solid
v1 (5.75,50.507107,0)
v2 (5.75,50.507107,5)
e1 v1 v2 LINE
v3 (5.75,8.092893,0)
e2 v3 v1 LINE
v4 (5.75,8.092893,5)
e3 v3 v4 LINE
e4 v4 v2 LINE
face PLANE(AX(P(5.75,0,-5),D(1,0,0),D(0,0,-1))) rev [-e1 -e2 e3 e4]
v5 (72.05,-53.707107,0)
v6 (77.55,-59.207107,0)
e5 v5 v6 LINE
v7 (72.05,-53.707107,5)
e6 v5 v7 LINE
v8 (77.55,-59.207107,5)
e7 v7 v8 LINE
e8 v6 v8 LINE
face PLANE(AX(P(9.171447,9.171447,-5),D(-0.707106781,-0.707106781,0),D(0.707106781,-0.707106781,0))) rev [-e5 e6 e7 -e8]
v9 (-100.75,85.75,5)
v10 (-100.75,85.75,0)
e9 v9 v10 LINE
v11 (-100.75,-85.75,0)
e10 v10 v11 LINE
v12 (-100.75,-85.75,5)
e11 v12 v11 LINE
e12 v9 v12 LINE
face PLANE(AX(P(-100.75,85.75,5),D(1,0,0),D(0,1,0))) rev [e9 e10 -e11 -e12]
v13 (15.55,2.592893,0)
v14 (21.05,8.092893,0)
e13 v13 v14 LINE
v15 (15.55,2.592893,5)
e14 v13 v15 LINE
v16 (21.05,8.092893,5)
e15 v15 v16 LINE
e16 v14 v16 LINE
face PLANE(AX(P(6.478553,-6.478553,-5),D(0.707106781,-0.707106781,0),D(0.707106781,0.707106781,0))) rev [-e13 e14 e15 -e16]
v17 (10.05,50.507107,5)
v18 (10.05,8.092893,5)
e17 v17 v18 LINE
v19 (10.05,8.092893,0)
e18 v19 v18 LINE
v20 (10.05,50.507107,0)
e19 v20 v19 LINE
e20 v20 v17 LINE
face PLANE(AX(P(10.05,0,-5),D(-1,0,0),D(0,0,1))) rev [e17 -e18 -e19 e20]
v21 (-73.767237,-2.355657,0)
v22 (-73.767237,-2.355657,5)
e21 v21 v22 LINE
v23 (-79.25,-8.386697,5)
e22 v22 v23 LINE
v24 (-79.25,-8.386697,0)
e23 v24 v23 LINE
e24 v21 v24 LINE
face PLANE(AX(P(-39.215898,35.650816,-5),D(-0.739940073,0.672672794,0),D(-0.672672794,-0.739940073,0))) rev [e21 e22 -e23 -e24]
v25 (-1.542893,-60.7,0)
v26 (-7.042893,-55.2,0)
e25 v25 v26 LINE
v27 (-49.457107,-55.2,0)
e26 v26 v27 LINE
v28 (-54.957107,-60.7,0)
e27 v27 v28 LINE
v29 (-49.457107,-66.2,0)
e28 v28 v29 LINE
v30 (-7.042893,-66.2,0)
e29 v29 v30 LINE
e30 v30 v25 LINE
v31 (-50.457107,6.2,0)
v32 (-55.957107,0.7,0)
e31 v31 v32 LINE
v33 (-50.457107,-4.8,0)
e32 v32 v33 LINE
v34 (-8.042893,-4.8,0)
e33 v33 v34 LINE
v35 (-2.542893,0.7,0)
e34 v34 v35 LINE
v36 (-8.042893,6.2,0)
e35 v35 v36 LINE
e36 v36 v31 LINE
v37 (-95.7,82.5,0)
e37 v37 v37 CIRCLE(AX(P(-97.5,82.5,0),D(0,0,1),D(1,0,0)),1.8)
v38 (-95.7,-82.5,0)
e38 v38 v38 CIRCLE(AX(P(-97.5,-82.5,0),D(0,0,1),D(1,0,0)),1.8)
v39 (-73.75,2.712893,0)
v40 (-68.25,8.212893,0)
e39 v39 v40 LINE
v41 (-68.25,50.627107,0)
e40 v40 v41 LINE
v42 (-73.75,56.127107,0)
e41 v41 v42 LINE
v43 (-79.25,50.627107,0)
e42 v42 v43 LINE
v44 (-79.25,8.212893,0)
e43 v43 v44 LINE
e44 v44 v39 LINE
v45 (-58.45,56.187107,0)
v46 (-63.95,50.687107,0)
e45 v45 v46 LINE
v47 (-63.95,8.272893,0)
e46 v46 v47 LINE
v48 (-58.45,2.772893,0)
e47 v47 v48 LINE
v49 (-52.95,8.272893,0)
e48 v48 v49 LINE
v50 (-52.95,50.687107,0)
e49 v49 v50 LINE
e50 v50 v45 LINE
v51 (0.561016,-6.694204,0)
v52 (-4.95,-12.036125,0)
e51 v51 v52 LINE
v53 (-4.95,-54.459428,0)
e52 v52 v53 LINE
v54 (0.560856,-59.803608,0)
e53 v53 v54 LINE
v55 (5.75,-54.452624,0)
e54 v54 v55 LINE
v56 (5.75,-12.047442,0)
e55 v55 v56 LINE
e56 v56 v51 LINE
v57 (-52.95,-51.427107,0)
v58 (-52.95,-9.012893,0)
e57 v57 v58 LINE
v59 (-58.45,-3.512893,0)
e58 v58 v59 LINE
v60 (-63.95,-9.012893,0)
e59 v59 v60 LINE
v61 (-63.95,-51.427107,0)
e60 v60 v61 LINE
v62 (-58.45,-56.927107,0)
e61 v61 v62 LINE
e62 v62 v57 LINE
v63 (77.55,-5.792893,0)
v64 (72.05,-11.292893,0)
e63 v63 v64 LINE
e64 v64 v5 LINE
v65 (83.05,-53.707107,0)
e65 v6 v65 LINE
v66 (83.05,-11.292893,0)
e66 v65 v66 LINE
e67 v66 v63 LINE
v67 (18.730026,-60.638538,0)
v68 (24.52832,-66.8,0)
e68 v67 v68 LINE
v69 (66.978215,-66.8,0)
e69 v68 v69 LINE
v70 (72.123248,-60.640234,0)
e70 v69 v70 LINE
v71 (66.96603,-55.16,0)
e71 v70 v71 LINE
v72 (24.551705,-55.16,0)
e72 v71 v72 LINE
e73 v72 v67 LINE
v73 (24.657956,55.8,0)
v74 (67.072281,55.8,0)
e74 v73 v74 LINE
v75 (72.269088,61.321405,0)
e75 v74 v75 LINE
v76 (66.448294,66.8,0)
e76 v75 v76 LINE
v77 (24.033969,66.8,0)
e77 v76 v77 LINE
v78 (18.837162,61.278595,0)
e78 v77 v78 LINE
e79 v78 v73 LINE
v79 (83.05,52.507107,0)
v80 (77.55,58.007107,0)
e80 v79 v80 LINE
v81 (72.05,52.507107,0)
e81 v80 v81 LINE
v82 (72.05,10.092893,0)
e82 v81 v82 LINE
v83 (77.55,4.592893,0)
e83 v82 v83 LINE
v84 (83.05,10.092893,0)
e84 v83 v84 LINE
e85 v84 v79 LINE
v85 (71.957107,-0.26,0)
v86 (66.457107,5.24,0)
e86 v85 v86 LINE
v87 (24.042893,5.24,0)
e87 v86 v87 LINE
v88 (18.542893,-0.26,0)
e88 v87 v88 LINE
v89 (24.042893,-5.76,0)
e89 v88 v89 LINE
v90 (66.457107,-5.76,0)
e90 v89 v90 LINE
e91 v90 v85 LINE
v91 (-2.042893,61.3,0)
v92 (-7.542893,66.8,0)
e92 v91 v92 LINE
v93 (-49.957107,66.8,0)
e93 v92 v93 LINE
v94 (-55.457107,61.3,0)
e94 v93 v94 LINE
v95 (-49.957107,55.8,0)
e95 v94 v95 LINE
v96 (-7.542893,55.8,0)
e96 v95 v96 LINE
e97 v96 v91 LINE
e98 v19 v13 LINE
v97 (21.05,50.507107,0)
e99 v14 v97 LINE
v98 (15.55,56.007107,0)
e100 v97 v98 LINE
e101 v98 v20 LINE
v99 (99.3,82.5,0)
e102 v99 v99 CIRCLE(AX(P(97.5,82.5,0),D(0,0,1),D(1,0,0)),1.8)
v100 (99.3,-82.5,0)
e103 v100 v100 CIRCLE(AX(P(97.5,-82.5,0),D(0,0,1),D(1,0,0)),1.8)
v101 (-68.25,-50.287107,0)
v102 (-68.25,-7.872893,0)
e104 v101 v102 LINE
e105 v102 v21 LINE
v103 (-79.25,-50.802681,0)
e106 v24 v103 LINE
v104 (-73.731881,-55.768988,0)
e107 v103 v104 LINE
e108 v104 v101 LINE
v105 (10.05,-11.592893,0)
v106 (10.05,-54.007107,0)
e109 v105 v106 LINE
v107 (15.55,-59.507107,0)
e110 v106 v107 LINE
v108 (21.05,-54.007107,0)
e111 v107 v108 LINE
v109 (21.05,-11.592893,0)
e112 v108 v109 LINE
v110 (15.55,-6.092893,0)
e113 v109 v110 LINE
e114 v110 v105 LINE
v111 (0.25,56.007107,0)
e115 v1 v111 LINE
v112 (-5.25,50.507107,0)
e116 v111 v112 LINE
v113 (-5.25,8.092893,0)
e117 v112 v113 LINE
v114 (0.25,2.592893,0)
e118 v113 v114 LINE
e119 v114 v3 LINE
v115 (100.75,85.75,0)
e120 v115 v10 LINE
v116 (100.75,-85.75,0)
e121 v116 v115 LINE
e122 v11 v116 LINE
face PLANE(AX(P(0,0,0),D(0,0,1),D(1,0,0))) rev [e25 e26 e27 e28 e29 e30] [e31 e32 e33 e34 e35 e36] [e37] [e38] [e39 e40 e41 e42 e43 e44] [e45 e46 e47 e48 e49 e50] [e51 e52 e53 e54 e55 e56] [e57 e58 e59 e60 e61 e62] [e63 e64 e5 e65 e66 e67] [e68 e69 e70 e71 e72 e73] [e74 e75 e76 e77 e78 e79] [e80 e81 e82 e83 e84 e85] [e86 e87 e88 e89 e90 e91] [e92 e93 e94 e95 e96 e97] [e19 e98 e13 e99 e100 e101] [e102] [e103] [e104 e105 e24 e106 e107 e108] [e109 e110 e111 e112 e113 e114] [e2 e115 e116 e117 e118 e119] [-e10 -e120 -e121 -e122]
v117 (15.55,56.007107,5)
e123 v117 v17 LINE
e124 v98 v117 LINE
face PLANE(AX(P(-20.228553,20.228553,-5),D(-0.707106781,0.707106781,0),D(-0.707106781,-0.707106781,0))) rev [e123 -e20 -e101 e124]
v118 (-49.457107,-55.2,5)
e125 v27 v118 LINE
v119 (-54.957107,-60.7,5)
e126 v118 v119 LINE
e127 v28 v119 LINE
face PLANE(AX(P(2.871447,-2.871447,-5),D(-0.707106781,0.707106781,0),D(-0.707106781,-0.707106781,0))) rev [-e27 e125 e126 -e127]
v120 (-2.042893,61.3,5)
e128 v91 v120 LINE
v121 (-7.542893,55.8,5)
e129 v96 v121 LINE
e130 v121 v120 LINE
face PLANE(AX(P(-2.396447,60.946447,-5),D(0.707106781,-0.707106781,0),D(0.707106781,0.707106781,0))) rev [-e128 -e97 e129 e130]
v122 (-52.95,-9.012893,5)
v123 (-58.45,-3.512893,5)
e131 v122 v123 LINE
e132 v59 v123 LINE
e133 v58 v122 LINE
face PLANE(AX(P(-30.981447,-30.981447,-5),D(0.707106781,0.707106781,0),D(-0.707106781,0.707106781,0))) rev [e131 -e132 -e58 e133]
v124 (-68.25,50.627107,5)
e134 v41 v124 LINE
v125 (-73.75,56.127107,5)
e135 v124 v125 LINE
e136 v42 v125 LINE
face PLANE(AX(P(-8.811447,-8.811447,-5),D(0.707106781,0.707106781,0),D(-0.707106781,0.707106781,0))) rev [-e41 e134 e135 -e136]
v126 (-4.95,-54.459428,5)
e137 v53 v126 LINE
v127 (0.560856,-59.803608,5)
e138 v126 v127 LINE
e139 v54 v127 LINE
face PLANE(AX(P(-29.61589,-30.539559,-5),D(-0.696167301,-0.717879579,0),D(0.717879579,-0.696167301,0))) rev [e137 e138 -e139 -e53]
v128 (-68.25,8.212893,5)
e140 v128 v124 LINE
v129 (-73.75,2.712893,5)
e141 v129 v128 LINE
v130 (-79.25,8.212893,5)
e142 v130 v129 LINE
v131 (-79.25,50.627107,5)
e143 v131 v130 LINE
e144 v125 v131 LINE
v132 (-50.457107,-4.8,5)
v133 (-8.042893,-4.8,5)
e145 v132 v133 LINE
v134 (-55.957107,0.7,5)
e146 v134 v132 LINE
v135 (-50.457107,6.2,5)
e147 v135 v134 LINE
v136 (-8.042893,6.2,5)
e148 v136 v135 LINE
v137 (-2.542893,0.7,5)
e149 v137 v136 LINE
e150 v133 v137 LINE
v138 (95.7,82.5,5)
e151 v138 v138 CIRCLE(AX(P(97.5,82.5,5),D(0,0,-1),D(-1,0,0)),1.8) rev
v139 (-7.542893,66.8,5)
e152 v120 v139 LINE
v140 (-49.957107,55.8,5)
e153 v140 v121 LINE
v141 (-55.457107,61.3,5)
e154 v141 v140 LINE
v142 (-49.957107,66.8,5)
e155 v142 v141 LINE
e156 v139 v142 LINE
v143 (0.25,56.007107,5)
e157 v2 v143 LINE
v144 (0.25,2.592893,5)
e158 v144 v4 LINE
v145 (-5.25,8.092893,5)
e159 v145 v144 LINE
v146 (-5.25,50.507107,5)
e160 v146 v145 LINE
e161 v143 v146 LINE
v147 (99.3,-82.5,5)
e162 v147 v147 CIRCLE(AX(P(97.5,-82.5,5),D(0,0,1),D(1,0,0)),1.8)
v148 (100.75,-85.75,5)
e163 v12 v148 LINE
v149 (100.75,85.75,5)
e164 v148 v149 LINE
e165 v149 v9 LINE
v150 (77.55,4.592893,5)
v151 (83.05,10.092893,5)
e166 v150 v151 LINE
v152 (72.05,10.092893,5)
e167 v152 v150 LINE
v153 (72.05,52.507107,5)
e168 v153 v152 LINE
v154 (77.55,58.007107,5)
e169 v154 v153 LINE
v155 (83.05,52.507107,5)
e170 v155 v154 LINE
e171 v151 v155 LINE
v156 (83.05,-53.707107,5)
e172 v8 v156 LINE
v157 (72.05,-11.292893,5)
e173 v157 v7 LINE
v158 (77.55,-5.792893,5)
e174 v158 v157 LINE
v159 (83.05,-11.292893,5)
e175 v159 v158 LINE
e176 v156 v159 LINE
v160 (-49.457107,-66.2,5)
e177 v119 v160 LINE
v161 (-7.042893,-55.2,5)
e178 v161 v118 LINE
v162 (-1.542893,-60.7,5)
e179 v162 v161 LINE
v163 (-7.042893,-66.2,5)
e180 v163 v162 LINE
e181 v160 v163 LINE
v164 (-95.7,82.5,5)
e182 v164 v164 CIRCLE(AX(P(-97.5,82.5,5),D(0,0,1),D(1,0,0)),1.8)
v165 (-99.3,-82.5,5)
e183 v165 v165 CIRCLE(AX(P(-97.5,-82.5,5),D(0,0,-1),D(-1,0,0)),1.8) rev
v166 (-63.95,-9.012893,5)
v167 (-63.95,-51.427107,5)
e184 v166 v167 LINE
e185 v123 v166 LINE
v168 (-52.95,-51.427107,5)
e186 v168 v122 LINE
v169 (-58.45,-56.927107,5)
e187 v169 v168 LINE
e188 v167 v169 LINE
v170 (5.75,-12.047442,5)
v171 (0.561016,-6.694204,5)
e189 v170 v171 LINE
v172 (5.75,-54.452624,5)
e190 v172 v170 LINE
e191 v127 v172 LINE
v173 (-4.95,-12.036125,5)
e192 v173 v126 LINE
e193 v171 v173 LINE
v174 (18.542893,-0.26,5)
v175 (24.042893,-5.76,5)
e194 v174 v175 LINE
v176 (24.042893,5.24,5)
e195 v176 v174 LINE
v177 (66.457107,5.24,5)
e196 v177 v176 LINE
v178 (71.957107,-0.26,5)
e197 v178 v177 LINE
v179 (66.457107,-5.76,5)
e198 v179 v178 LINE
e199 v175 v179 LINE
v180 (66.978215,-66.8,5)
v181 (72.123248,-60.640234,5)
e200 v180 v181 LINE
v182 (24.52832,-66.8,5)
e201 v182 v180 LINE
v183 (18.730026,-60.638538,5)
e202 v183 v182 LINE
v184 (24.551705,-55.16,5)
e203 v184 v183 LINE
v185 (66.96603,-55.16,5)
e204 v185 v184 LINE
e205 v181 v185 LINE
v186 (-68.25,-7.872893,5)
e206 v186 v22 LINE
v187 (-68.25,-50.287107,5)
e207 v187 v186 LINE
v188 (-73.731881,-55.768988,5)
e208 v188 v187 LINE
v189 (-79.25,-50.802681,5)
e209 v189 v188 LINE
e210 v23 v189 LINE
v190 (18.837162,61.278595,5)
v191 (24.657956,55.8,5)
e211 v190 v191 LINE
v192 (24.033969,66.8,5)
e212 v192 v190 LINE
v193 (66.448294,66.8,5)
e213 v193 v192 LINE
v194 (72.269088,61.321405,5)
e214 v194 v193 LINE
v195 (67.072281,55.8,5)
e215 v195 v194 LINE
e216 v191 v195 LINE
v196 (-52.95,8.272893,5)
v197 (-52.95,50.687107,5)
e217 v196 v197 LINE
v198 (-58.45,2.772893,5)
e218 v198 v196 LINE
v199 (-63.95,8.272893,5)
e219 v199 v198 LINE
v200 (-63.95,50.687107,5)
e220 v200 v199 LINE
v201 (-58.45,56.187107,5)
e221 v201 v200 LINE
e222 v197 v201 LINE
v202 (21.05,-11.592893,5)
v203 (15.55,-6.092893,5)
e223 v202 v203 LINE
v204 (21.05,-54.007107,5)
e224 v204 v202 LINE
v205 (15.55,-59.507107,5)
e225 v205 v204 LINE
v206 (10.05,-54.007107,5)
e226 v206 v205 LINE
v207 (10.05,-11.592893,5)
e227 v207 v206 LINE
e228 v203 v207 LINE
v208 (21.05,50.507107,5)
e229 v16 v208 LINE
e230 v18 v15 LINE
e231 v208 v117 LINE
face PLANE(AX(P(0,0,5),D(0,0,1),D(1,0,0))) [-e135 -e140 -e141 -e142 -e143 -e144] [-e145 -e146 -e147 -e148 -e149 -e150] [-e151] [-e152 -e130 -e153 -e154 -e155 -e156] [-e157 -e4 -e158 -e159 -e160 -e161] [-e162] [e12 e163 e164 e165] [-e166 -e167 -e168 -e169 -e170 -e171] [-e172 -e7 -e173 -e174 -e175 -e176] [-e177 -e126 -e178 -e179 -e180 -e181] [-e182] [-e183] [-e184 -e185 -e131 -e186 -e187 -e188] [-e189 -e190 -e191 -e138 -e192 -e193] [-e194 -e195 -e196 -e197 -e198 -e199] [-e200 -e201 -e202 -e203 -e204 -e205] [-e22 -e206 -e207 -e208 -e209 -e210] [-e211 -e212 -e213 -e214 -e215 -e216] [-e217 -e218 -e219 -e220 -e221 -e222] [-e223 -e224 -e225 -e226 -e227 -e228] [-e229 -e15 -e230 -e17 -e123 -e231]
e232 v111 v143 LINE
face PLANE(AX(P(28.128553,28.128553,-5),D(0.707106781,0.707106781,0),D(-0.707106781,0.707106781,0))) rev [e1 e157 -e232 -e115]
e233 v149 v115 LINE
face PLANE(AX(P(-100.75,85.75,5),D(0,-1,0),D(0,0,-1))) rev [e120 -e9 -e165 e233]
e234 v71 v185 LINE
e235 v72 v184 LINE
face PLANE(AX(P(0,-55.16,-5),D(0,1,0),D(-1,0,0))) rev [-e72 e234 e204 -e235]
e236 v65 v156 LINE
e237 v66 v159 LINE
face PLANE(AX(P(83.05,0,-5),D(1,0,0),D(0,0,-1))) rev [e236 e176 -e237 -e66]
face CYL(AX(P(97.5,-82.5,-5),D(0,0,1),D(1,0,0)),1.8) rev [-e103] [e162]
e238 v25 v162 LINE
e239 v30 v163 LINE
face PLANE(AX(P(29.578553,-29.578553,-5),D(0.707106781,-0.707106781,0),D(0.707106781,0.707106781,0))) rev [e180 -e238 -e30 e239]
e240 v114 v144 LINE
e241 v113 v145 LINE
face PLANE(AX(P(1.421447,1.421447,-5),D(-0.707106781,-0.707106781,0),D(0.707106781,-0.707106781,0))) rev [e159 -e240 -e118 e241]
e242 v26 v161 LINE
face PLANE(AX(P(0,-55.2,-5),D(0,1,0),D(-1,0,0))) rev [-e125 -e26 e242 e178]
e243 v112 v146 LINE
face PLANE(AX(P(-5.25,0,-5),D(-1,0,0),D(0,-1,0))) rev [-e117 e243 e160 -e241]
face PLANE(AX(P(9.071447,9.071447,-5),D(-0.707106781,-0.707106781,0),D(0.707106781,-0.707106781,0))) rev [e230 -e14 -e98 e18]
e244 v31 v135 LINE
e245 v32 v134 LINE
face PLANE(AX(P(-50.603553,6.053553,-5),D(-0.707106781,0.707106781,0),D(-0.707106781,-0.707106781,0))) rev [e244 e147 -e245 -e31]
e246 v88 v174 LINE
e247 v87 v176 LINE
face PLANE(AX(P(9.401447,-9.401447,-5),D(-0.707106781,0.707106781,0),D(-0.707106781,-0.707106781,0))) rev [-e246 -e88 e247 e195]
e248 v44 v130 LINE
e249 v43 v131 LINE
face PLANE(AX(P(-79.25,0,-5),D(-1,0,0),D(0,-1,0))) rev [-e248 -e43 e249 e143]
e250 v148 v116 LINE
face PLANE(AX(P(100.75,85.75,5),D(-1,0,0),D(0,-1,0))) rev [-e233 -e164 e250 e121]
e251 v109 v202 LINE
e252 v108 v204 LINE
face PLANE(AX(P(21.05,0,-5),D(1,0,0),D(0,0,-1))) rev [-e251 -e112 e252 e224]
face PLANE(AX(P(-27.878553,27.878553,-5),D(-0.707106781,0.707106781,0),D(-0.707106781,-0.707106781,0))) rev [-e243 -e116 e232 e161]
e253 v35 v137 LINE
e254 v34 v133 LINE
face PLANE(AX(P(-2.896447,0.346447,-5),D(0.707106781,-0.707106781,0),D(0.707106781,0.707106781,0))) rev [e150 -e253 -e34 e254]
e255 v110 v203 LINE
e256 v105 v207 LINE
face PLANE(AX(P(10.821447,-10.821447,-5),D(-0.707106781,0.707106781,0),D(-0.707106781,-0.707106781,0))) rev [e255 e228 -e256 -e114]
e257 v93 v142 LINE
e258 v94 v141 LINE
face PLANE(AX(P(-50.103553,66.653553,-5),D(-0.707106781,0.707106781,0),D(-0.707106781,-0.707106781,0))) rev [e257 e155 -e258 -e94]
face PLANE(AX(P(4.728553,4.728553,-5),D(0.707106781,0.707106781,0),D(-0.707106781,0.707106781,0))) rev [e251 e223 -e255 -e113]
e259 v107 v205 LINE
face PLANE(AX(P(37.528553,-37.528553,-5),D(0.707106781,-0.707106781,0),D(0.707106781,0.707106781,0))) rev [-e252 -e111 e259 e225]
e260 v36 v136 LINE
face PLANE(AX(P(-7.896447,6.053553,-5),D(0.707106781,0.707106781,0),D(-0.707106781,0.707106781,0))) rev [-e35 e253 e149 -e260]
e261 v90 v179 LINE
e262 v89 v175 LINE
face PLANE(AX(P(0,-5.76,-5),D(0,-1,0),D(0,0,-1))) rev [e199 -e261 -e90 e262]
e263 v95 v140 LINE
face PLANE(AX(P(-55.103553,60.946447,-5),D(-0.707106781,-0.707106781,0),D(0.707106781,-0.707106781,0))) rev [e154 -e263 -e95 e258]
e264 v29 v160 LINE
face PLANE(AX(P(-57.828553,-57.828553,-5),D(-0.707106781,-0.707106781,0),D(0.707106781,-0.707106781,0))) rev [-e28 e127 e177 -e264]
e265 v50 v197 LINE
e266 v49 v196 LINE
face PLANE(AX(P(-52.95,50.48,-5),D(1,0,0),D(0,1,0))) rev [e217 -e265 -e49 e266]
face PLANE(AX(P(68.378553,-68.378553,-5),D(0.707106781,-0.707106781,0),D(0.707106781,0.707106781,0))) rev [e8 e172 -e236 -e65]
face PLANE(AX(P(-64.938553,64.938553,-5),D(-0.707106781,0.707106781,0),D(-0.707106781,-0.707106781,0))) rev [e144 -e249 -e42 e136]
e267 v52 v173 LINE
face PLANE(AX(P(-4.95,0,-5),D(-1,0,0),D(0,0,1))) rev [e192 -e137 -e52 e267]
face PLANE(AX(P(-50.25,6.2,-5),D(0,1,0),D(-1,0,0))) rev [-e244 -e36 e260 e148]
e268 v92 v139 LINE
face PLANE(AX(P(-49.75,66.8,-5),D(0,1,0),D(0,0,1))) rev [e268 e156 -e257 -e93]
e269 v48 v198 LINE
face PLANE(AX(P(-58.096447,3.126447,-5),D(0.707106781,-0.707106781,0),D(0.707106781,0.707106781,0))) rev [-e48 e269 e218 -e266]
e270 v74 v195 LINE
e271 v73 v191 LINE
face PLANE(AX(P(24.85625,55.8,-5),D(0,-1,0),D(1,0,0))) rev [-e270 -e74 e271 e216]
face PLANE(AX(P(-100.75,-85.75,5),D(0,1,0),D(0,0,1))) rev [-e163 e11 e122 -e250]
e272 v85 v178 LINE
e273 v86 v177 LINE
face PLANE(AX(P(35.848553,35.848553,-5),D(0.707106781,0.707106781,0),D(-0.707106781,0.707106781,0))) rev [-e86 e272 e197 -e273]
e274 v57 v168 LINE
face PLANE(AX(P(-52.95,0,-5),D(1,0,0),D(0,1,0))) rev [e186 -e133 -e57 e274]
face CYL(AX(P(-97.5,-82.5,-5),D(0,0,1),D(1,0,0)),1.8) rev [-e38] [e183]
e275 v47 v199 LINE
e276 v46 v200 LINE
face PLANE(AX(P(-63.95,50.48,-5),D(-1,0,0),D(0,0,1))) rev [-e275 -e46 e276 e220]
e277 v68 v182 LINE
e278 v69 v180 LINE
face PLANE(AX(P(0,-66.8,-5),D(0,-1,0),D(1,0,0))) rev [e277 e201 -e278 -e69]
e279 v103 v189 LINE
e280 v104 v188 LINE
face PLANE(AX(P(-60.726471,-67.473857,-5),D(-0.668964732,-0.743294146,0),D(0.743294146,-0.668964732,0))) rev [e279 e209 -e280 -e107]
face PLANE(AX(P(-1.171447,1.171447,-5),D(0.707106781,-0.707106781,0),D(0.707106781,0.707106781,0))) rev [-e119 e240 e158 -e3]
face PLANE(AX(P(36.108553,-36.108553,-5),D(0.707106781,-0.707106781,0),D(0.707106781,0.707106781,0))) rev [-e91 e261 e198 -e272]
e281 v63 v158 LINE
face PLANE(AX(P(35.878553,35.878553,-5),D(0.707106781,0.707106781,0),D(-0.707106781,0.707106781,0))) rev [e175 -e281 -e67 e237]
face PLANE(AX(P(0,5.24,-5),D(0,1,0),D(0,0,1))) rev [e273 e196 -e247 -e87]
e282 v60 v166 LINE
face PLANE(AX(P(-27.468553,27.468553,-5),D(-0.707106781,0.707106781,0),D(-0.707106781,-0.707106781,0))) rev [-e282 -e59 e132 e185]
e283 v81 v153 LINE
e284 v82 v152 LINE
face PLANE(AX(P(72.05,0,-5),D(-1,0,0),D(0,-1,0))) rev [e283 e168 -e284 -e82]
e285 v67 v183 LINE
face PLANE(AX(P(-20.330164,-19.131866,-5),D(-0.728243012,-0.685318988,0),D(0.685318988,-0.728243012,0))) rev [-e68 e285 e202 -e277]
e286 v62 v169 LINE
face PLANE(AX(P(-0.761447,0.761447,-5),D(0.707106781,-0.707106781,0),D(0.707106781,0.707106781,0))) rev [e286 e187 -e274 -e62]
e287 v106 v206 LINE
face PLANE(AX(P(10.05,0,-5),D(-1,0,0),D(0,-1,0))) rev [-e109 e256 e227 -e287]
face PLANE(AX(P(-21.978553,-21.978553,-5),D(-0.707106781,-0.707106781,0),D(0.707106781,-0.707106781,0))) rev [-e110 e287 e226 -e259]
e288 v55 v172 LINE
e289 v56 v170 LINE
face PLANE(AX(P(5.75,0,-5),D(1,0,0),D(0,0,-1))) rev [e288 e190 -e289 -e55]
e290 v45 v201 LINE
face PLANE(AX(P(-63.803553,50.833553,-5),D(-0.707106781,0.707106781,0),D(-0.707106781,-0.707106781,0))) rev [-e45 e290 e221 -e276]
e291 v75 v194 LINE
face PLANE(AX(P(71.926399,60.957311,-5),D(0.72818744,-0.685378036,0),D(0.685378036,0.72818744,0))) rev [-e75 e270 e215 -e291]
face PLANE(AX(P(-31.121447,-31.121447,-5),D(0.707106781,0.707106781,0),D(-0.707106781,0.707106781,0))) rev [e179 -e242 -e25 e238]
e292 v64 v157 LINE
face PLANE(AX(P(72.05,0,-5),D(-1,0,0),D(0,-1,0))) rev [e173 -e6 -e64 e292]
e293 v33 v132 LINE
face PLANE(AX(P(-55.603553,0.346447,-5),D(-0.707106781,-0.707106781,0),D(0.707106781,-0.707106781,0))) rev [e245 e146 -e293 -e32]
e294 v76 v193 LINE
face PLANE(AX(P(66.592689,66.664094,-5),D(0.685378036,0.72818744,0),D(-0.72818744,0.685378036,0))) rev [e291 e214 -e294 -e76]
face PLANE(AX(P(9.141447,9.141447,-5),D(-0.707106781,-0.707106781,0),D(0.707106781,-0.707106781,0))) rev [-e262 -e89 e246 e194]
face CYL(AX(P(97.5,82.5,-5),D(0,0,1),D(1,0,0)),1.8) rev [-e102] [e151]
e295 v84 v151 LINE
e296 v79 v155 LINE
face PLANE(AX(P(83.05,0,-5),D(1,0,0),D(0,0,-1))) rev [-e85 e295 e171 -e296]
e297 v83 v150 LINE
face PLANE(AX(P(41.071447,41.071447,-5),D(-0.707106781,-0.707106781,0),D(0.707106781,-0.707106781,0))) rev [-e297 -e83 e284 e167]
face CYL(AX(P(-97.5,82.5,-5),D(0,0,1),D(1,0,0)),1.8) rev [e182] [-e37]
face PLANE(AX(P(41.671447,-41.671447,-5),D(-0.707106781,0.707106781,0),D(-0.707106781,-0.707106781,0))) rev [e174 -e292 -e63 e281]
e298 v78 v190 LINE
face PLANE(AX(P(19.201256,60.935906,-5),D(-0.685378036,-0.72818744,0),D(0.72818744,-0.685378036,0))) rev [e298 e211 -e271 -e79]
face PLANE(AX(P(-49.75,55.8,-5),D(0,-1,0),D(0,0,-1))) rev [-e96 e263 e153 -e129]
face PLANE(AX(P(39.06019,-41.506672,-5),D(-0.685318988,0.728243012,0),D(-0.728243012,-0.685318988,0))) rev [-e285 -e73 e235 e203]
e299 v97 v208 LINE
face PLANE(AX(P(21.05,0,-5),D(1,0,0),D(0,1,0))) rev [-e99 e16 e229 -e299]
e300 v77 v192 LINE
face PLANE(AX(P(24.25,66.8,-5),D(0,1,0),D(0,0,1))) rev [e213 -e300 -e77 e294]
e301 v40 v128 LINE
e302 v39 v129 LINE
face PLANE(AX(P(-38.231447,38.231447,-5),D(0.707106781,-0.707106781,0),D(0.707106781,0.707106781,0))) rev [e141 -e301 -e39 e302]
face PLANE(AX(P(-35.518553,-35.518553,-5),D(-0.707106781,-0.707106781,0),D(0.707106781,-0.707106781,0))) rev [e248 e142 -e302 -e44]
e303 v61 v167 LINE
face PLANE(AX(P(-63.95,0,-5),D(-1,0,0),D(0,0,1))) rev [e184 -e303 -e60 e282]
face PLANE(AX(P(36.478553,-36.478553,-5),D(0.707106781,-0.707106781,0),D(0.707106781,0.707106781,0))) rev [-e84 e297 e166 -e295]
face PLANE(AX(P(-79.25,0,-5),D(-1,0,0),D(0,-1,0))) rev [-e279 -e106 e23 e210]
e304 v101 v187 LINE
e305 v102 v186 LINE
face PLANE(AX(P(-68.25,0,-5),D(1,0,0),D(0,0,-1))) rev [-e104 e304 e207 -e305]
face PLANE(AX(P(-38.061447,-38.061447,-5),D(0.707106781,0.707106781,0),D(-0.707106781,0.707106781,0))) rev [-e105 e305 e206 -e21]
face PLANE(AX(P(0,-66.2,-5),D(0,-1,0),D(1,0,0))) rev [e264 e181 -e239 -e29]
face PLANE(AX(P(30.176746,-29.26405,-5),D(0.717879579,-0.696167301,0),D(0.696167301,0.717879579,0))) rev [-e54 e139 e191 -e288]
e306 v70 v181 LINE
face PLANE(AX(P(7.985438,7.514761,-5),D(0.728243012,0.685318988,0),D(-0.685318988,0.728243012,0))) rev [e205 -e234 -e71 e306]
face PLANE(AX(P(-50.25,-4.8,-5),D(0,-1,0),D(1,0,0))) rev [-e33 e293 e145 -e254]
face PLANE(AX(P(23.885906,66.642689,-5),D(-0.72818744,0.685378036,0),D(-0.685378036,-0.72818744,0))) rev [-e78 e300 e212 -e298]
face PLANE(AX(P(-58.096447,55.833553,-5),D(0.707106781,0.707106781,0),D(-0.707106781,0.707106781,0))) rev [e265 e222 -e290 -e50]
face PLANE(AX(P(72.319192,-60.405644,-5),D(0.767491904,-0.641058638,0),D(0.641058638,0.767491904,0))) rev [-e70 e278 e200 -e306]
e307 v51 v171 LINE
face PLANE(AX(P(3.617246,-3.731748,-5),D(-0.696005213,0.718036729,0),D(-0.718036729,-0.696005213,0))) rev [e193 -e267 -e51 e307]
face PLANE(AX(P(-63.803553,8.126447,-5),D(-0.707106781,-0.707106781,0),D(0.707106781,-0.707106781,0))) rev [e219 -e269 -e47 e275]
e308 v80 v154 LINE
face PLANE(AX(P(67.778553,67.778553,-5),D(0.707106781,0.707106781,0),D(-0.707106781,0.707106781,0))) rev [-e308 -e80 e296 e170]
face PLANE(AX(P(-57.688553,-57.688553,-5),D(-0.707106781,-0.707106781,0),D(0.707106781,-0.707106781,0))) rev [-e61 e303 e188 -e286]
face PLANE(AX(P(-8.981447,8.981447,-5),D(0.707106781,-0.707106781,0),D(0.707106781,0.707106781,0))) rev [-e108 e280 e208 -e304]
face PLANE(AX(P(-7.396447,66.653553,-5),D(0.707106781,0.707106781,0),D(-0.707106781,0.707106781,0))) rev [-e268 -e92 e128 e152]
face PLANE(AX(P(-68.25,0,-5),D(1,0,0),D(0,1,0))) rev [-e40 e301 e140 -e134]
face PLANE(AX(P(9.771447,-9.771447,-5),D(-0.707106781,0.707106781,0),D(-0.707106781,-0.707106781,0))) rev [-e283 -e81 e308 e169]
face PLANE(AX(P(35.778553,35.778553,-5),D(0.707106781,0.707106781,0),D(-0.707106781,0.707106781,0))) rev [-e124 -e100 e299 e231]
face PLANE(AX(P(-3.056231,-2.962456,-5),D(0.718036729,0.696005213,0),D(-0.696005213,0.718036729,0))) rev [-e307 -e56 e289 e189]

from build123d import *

# Parameters (mm, degrees)
SKETCH1_W          = 201.5
SKETCH1_H          = 171.5
MAIN_BODY_DEPTH    = 5
CUT_START          = -5
CUT_AREA_OUTLINE_R = 1.8
CUT_AREA_DEPTH     = 5


# Read off the part's stored shape, not the designer's step: Cut Area
with BuildPart() as part:
    # Sketch1 → Main Body (new body)
    with BuildSketch(Plane.XY):
        Rectangle(SKETCH1_W, SKETCH1_H)
    extrude(amount=MAIN_BODY_DEPTH)

    # Cut Area outline → Cut Area (cut)
    with BuildSketch(Plane.XY.offset(5).offset(CUT_START)):
        Polygon((-68.25, 50.627106781), (-73.75, 56.127106781), (-79.25, 50.627106781), (-79.25, 8.212893219), (-73.75, 2.712893219), (-68.25, 8.212893219), align=None)
        Polygon((-73.731881274, -55.768988055), (-68.25, -50.287106781), (-68.25, -7.872893219), (-73.767236503, -2.355656716), (-79.25, -8.386696563), (-79.25, -50.802681202), align=None)
        with Locations((97.5, 82.5)):
            Circle(CUT_AREA_OUTLINE_R)
        with Locations((-97.5, -82.5)):
            Circle(CUT_AREA_OUTLINE_R)
        with Locations((97.5, -82.5)):
            Circle(CUT_AREA_OUTLINE_R)
        Polygon((-8.042893219, 6.2), (-50.457106781, 6.2), (-55.957106781, 0.7), (-50.457106781, -4.8), (-8.042893219, -4.8), (-2.542893219, 0.7), align=None)
        Polygon((-49.457106781, -55.2), (-54.957106781, -60.7), (-49.457106781, -66.2), (-7.042893219, -66.2), (-1.542893219, -60.7), (-7.042893219, -55.2), align=None)
        Polygon((5.75, 50.507106781), (0.25, 56.007106781), (-5.25, 50.507106781), (-5.25, 8.092893219), (0.25, 2.592893219), (5.75, 8.092893219), align=None)
        Polygon((0.560856139, -59.803608472), (5.75, -54.452624011), (5.75, -12.047441696), (0.561015758, -6.694204099), (-4.95, -12.036125396), (-4.95, -54.459428254), align=None)
        Polygon((66.448293895, 66.8), (24.033969108, 66.8), (18.837162213, 61.278595298), (24.657956105, 55.8), (67.072280892, 55.8), (72.269087787, 61.321404702), align=None)
        Polygon((-2.042893219, 61.3), (-7.542893219, 66.8), (-49.957106781, 66.8), (-55.457106781, 61.3), (-49.957106781, 55.8), (-7.542893219, 55.8), align=None)
        Polygon((-52.95, 8.272893219), (-52.95, 50.687106781), (-58.45, 56.187106781), (-63.95, 50.687106781), (-63.95, 8.272893219), (-58.45, 2.772893219), align=None)
        Polygon((-58.45, -56.927106781), (-52.95, -51.427106781), (-52.95, -9.012893219), (-58.45, -3.512893219), (-63.95, -9.012893219), (-63.95, -51.427106781), align=None)
        Polygon((24.042893219, 5.24), (18.542893219, -0.26), (24.042893219, -5.76), (66.457106781, -5.76), (71.957106781, -0.26), (66.457106781, 5.24), align=None)
        Polygon((83.05, 52.507106781), (77.55, 58.007106781), (72.05, 52.507106781), (72.05, 10.092893219), (77.55, 4.592893219), (83.05, 10.092893219), align=None)
        Polygon((77.55, -59.207106781), (83.05, -53.707106781), (83.05, -11.292893219), (77.55, -5.792893219), (72.05, -11.292893219), (72.05, -53.707106781), align=None)
        with Locations((-97.5, 82.5)):
            Circle(CUT_AREA_OUTLINE_R)
        Polygon((21.05, 50.507106781), (15.55, 56.007106781), (10.05, 50.507106781), (10.05, 8.092893219), (15.55, 2.592893219), (21.05, 8.092893219), align=None)
        Polygon((15.55, -59.507106781), (21.05, -54.007106781), (21.05, -11.592893219), (15.55, -6.092893219), (10.05, -11.592893219), (10.05, -54.007106781), align=None)
        Polygon((24.551704565, -55.16), (18.730025795, -60.638537988), (24.528319558, -66.8), (66.978214993, -66.8), (72.123248282, -60.640233696), (66.966029948, -55.16), align=None)
    extrude(amount=CUT_AREA_DEPTH, mode=Mode.SUBTRACT)


solid = part.part
